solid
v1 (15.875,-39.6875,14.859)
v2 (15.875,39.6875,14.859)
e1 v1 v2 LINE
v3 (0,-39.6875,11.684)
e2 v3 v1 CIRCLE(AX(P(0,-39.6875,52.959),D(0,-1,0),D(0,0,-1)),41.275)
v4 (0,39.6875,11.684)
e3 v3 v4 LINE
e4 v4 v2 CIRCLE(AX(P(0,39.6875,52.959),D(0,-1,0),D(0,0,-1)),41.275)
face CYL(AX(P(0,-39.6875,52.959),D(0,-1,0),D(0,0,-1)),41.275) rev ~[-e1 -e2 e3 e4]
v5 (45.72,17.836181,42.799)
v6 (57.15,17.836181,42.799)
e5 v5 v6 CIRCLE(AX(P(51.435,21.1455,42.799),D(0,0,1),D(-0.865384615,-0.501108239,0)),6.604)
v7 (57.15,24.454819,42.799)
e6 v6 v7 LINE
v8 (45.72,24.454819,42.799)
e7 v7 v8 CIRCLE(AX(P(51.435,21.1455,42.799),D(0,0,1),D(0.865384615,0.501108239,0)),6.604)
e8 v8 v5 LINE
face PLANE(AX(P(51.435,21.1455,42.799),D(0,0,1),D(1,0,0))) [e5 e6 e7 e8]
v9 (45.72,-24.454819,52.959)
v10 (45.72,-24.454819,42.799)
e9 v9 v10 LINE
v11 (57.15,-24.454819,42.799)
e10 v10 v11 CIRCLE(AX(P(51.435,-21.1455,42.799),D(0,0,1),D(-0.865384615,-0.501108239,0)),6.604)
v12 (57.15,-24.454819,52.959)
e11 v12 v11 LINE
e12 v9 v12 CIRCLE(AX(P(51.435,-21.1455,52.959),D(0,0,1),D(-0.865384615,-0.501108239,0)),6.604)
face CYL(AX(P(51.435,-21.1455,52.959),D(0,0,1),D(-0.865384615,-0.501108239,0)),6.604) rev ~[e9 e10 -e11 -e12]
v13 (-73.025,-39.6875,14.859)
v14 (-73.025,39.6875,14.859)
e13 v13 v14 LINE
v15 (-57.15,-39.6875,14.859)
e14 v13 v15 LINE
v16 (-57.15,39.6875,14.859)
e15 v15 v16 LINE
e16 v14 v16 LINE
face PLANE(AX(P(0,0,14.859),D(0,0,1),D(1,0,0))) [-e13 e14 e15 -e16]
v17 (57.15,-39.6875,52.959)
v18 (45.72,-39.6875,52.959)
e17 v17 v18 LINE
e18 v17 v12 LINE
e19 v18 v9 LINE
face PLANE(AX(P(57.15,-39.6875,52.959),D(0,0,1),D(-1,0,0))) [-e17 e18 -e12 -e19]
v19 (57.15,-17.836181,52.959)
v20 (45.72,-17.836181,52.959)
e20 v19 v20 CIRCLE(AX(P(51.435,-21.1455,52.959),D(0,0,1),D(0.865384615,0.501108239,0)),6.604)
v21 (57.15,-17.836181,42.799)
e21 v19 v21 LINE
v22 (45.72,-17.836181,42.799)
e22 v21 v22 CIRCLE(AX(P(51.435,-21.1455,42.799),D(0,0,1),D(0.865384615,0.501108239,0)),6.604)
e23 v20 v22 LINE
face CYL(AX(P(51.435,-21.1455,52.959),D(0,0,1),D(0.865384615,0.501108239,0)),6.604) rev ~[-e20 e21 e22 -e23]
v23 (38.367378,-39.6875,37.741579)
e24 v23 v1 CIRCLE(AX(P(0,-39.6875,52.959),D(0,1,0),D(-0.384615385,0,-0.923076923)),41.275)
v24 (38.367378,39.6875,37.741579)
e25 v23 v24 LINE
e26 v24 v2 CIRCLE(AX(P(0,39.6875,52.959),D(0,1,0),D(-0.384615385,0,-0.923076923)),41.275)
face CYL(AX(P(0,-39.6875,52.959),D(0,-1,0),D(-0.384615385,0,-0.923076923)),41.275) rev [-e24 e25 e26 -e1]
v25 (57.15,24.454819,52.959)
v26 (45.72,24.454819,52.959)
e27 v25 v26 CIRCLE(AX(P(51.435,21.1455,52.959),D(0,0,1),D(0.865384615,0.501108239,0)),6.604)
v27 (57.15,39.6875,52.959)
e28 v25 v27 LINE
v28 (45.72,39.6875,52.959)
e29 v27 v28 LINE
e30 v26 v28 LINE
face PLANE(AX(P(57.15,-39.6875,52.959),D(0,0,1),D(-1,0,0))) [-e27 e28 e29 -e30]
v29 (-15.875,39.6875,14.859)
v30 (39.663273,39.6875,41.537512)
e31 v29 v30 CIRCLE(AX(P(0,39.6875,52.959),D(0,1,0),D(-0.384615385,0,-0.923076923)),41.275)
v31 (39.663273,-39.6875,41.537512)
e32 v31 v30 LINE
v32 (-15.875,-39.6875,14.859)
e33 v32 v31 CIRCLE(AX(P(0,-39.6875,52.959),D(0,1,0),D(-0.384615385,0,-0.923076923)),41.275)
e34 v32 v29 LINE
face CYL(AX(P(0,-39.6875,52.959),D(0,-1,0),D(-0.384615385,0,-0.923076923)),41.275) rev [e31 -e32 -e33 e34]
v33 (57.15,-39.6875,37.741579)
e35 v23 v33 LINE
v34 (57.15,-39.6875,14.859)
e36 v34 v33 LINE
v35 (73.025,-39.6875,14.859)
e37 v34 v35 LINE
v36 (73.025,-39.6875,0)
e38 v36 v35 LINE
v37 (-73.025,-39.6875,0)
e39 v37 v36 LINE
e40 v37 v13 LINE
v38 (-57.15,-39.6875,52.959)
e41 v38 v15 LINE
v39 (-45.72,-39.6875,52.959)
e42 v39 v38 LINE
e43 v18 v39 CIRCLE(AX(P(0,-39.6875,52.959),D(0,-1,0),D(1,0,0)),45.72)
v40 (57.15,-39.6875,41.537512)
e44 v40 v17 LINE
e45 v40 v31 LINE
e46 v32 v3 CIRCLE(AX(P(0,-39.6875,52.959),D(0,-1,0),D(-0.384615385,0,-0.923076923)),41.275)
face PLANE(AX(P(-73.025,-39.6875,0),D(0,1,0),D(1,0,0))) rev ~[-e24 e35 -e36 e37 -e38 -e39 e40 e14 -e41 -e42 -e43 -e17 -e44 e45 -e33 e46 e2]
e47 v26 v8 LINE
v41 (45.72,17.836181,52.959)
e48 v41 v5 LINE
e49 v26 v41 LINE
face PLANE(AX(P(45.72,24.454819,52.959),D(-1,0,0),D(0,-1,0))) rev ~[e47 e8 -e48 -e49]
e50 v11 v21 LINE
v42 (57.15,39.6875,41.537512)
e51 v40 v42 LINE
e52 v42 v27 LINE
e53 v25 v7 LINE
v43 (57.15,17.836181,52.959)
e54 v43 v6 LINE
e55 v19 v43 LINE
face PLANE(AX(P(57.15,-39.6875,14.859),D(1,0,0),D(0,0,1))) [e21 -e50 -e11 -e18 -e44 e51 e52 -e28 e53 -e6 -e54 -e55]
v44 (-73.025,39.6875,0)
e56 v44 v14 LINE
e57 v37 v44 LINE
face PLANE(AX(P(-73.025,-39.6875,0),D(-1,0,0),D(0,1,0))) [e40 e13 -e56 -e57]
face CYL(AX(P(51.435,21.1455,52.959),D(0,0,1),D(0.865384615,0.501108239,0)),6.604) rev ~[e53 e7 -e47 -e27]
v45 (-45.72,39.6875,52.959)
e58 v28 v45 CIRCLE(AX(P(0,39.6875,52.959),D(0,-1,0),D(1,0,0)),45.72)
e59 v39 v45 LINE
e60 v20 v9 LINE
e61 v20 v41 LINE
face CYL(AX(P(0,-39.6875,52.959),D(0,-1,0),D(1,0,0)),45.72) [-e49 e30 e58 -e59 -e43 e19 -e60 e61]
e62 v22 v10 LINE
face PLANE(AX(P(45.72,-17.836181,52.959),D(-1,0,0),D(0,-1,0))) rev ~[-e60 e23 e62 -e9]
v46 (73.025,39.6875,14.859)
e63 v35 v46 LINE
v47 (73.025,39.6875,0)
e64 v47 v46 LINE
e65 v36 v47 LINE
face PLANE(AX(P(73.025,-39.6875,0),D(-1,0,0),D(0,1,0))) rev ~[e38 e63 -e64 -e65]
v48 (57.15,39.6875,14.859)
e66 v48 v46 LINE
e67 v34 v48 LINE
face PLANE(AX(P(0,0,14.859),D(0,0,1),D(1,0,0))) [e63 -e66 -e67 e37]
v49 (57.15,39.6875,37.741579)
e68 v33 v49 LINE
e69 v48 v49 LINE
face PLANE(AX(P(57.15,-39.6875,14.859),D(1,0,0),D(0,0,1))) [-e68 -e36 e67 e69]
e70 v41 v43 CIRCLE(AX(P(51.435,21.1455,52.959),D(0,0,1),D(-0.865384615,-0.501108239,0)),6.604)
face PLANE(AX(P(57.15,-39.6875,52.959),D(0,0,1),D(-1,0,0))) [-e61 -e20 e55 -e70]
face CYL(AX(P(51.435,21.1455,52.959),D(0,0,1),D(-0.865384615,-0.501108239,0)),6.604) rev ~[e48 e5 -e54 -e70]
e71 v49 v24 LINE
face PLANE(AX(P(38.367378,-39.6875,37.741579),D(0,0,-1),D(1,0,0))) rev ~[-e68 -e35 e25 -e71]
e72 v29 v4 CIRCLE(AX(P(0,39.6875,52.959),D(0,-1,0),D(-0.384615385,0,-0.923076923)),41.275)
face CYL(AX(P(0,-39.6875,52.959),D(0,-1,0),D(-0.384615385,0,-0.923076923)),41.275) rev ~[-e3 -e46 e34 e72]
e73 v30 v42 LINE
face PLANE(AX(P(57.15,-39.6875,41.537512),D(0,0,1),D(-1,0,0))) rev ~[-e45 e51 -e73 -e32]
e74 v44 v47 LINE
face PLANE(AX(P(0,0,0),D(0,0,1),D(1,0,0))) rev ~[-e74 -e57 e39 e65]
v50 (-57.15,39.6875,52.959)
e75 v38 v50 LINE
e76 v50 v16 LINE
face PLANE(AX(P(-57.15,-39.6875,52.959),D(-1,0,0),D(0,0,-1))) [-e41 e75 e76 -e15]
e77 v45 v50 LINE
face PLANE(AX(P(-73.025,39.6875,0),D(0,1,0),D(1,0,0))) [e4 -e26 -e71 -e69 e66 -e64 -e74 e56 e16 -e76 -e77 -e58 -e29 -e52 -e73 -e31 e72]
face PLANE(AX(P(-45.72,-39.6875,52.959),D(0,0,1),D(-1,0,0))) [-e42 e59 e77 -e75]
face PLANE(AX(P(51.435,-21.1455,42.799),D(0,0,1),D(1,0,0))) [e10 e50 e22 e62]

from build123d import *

# Parameters (mm, degrees)
F0_W     = 146.05
F0_H     = 79.375
F1_DEPTH = 14.859
F3_DEPTH = 79.375
F4_DEPTH = 85.725
F6_DEPTH = 79.376
F8_DEPTH = 10.16


with BuildPart() as f1:
    # F0 (on Top) → F1 (new body)
    with BuildSketch(Plane.XY):
        Rectangle(F0_W, F0_H)
    extrude(amount=F1_DEPTH)

    # F2 (on face) → F3 (join)
    with BuildSketch(Plane.XZ.offset(39.6875)):
        with BuildLine():
            Line((-57.15, 14.859), (-15.875, 14.859))
            ThreePointArc((-15.875, 14.859), (-22.8952505992, 87.3018758988), (41.275, 52.959))
            ThreePointArc((41.275, 52.959), (34.3428758988, 30.0637494008), (15.875, 14.859))
            Line((15.875, 14.859), (57.15, 14.859))
            Line((57.15, 14.859), (57.15, 52.959))
            Line((57.15, 52.959), (45.72, 52.959))
            ThreePointArc((45.72, 52.959), (0, 98.679), (-45.72, 52.959))
            Line((-45.72, 52.959), (-57.15, 52.959))
            Line((-57.15, 52.959), (-57.15, 14.859))
        make_face()
    extrude(amount=-F3_DEPTH)

    # F2 (on face) → F4 (cut)
    with BuildSketch(Plane.XZ.offset(39.6875)):
        with BuildLine():
            Line((0, 14.859), (0, 11.684))
            ThreePointArc((0, 11.684), (8.0946934778, 12.4855326109), (15.875, 14.859))
            Line((15.875, 14.859), (0, 14.859))
        make_face()
        with BuildLine():
            ThreePointArc((-15.875, 14.859), (-8.0946934778, 12.4855326109), (0, 11.684))
            Line((0, 11.684), (0, 14.859))
            Line((0, 14.859), (-15.875, 14.859))
        make_face()
    extrude(amount=-F4_DEPTH, mode=Mode.SUBTRACT)

    # F5 (on face) → F6 (cut, through all)
    with BuildSketch(Plane.XZ.offset(39.6875)):
        with BuildLine():
            Line((57.15, 37.7415791154), (57.15, 41.5375120938))
            Line((57.15, 41.5375120938), (39.6632731757, 41.5375120938))
            ThreePointArc((39.6632731757, 41.5375120938), (39.0614634109, 39.6237946698), (38.3673784174, 37.7415791154))
            Line((38.3673784174, 37.7415791154), (57.15, 37.7415791154))
        make_face()
    extrude(amount=-F6_DEPTH, mode=Mode.SUBTRACT)

    # F7 (on face) → F8 (cut)
    with BuildSketch(Plane.XY.offset(52.959)):
        with BuildLine():
            Line((57.15, 17.8361811879), (57.15, 24.4548188121))
            ThreePointArc((57.15, 24.4548188121), (51.435, 27.7495), (45.72, 24.4548188121))
            Line((45.72, 24.4548188121), (45.72, 17.8361811879))
            ThreePointArc((45.72, 17.8361811879), (51.435, 14.5415), (57.15, 17.8361811879))
        make_face()
        with BuildLine():
            Line((57.15, -24.4548188121), (57.15, -17.8361811879))
            ThreePointArc((57.15, -17.8361811879), (51.435, -14.5415), (45.72, -17.8361811879))
            Line((45.72, -17.8361811879), (45.72, -24.4548188121))
            ThreePointArc((45.72, -24.4548188121), (51.435, -27.7495), (57.15, -24.4548188121))
        make_face()
    extrude(amount=-F8_DEPTH, mode=Mode.SUBTRACT)


solid = f1.part
